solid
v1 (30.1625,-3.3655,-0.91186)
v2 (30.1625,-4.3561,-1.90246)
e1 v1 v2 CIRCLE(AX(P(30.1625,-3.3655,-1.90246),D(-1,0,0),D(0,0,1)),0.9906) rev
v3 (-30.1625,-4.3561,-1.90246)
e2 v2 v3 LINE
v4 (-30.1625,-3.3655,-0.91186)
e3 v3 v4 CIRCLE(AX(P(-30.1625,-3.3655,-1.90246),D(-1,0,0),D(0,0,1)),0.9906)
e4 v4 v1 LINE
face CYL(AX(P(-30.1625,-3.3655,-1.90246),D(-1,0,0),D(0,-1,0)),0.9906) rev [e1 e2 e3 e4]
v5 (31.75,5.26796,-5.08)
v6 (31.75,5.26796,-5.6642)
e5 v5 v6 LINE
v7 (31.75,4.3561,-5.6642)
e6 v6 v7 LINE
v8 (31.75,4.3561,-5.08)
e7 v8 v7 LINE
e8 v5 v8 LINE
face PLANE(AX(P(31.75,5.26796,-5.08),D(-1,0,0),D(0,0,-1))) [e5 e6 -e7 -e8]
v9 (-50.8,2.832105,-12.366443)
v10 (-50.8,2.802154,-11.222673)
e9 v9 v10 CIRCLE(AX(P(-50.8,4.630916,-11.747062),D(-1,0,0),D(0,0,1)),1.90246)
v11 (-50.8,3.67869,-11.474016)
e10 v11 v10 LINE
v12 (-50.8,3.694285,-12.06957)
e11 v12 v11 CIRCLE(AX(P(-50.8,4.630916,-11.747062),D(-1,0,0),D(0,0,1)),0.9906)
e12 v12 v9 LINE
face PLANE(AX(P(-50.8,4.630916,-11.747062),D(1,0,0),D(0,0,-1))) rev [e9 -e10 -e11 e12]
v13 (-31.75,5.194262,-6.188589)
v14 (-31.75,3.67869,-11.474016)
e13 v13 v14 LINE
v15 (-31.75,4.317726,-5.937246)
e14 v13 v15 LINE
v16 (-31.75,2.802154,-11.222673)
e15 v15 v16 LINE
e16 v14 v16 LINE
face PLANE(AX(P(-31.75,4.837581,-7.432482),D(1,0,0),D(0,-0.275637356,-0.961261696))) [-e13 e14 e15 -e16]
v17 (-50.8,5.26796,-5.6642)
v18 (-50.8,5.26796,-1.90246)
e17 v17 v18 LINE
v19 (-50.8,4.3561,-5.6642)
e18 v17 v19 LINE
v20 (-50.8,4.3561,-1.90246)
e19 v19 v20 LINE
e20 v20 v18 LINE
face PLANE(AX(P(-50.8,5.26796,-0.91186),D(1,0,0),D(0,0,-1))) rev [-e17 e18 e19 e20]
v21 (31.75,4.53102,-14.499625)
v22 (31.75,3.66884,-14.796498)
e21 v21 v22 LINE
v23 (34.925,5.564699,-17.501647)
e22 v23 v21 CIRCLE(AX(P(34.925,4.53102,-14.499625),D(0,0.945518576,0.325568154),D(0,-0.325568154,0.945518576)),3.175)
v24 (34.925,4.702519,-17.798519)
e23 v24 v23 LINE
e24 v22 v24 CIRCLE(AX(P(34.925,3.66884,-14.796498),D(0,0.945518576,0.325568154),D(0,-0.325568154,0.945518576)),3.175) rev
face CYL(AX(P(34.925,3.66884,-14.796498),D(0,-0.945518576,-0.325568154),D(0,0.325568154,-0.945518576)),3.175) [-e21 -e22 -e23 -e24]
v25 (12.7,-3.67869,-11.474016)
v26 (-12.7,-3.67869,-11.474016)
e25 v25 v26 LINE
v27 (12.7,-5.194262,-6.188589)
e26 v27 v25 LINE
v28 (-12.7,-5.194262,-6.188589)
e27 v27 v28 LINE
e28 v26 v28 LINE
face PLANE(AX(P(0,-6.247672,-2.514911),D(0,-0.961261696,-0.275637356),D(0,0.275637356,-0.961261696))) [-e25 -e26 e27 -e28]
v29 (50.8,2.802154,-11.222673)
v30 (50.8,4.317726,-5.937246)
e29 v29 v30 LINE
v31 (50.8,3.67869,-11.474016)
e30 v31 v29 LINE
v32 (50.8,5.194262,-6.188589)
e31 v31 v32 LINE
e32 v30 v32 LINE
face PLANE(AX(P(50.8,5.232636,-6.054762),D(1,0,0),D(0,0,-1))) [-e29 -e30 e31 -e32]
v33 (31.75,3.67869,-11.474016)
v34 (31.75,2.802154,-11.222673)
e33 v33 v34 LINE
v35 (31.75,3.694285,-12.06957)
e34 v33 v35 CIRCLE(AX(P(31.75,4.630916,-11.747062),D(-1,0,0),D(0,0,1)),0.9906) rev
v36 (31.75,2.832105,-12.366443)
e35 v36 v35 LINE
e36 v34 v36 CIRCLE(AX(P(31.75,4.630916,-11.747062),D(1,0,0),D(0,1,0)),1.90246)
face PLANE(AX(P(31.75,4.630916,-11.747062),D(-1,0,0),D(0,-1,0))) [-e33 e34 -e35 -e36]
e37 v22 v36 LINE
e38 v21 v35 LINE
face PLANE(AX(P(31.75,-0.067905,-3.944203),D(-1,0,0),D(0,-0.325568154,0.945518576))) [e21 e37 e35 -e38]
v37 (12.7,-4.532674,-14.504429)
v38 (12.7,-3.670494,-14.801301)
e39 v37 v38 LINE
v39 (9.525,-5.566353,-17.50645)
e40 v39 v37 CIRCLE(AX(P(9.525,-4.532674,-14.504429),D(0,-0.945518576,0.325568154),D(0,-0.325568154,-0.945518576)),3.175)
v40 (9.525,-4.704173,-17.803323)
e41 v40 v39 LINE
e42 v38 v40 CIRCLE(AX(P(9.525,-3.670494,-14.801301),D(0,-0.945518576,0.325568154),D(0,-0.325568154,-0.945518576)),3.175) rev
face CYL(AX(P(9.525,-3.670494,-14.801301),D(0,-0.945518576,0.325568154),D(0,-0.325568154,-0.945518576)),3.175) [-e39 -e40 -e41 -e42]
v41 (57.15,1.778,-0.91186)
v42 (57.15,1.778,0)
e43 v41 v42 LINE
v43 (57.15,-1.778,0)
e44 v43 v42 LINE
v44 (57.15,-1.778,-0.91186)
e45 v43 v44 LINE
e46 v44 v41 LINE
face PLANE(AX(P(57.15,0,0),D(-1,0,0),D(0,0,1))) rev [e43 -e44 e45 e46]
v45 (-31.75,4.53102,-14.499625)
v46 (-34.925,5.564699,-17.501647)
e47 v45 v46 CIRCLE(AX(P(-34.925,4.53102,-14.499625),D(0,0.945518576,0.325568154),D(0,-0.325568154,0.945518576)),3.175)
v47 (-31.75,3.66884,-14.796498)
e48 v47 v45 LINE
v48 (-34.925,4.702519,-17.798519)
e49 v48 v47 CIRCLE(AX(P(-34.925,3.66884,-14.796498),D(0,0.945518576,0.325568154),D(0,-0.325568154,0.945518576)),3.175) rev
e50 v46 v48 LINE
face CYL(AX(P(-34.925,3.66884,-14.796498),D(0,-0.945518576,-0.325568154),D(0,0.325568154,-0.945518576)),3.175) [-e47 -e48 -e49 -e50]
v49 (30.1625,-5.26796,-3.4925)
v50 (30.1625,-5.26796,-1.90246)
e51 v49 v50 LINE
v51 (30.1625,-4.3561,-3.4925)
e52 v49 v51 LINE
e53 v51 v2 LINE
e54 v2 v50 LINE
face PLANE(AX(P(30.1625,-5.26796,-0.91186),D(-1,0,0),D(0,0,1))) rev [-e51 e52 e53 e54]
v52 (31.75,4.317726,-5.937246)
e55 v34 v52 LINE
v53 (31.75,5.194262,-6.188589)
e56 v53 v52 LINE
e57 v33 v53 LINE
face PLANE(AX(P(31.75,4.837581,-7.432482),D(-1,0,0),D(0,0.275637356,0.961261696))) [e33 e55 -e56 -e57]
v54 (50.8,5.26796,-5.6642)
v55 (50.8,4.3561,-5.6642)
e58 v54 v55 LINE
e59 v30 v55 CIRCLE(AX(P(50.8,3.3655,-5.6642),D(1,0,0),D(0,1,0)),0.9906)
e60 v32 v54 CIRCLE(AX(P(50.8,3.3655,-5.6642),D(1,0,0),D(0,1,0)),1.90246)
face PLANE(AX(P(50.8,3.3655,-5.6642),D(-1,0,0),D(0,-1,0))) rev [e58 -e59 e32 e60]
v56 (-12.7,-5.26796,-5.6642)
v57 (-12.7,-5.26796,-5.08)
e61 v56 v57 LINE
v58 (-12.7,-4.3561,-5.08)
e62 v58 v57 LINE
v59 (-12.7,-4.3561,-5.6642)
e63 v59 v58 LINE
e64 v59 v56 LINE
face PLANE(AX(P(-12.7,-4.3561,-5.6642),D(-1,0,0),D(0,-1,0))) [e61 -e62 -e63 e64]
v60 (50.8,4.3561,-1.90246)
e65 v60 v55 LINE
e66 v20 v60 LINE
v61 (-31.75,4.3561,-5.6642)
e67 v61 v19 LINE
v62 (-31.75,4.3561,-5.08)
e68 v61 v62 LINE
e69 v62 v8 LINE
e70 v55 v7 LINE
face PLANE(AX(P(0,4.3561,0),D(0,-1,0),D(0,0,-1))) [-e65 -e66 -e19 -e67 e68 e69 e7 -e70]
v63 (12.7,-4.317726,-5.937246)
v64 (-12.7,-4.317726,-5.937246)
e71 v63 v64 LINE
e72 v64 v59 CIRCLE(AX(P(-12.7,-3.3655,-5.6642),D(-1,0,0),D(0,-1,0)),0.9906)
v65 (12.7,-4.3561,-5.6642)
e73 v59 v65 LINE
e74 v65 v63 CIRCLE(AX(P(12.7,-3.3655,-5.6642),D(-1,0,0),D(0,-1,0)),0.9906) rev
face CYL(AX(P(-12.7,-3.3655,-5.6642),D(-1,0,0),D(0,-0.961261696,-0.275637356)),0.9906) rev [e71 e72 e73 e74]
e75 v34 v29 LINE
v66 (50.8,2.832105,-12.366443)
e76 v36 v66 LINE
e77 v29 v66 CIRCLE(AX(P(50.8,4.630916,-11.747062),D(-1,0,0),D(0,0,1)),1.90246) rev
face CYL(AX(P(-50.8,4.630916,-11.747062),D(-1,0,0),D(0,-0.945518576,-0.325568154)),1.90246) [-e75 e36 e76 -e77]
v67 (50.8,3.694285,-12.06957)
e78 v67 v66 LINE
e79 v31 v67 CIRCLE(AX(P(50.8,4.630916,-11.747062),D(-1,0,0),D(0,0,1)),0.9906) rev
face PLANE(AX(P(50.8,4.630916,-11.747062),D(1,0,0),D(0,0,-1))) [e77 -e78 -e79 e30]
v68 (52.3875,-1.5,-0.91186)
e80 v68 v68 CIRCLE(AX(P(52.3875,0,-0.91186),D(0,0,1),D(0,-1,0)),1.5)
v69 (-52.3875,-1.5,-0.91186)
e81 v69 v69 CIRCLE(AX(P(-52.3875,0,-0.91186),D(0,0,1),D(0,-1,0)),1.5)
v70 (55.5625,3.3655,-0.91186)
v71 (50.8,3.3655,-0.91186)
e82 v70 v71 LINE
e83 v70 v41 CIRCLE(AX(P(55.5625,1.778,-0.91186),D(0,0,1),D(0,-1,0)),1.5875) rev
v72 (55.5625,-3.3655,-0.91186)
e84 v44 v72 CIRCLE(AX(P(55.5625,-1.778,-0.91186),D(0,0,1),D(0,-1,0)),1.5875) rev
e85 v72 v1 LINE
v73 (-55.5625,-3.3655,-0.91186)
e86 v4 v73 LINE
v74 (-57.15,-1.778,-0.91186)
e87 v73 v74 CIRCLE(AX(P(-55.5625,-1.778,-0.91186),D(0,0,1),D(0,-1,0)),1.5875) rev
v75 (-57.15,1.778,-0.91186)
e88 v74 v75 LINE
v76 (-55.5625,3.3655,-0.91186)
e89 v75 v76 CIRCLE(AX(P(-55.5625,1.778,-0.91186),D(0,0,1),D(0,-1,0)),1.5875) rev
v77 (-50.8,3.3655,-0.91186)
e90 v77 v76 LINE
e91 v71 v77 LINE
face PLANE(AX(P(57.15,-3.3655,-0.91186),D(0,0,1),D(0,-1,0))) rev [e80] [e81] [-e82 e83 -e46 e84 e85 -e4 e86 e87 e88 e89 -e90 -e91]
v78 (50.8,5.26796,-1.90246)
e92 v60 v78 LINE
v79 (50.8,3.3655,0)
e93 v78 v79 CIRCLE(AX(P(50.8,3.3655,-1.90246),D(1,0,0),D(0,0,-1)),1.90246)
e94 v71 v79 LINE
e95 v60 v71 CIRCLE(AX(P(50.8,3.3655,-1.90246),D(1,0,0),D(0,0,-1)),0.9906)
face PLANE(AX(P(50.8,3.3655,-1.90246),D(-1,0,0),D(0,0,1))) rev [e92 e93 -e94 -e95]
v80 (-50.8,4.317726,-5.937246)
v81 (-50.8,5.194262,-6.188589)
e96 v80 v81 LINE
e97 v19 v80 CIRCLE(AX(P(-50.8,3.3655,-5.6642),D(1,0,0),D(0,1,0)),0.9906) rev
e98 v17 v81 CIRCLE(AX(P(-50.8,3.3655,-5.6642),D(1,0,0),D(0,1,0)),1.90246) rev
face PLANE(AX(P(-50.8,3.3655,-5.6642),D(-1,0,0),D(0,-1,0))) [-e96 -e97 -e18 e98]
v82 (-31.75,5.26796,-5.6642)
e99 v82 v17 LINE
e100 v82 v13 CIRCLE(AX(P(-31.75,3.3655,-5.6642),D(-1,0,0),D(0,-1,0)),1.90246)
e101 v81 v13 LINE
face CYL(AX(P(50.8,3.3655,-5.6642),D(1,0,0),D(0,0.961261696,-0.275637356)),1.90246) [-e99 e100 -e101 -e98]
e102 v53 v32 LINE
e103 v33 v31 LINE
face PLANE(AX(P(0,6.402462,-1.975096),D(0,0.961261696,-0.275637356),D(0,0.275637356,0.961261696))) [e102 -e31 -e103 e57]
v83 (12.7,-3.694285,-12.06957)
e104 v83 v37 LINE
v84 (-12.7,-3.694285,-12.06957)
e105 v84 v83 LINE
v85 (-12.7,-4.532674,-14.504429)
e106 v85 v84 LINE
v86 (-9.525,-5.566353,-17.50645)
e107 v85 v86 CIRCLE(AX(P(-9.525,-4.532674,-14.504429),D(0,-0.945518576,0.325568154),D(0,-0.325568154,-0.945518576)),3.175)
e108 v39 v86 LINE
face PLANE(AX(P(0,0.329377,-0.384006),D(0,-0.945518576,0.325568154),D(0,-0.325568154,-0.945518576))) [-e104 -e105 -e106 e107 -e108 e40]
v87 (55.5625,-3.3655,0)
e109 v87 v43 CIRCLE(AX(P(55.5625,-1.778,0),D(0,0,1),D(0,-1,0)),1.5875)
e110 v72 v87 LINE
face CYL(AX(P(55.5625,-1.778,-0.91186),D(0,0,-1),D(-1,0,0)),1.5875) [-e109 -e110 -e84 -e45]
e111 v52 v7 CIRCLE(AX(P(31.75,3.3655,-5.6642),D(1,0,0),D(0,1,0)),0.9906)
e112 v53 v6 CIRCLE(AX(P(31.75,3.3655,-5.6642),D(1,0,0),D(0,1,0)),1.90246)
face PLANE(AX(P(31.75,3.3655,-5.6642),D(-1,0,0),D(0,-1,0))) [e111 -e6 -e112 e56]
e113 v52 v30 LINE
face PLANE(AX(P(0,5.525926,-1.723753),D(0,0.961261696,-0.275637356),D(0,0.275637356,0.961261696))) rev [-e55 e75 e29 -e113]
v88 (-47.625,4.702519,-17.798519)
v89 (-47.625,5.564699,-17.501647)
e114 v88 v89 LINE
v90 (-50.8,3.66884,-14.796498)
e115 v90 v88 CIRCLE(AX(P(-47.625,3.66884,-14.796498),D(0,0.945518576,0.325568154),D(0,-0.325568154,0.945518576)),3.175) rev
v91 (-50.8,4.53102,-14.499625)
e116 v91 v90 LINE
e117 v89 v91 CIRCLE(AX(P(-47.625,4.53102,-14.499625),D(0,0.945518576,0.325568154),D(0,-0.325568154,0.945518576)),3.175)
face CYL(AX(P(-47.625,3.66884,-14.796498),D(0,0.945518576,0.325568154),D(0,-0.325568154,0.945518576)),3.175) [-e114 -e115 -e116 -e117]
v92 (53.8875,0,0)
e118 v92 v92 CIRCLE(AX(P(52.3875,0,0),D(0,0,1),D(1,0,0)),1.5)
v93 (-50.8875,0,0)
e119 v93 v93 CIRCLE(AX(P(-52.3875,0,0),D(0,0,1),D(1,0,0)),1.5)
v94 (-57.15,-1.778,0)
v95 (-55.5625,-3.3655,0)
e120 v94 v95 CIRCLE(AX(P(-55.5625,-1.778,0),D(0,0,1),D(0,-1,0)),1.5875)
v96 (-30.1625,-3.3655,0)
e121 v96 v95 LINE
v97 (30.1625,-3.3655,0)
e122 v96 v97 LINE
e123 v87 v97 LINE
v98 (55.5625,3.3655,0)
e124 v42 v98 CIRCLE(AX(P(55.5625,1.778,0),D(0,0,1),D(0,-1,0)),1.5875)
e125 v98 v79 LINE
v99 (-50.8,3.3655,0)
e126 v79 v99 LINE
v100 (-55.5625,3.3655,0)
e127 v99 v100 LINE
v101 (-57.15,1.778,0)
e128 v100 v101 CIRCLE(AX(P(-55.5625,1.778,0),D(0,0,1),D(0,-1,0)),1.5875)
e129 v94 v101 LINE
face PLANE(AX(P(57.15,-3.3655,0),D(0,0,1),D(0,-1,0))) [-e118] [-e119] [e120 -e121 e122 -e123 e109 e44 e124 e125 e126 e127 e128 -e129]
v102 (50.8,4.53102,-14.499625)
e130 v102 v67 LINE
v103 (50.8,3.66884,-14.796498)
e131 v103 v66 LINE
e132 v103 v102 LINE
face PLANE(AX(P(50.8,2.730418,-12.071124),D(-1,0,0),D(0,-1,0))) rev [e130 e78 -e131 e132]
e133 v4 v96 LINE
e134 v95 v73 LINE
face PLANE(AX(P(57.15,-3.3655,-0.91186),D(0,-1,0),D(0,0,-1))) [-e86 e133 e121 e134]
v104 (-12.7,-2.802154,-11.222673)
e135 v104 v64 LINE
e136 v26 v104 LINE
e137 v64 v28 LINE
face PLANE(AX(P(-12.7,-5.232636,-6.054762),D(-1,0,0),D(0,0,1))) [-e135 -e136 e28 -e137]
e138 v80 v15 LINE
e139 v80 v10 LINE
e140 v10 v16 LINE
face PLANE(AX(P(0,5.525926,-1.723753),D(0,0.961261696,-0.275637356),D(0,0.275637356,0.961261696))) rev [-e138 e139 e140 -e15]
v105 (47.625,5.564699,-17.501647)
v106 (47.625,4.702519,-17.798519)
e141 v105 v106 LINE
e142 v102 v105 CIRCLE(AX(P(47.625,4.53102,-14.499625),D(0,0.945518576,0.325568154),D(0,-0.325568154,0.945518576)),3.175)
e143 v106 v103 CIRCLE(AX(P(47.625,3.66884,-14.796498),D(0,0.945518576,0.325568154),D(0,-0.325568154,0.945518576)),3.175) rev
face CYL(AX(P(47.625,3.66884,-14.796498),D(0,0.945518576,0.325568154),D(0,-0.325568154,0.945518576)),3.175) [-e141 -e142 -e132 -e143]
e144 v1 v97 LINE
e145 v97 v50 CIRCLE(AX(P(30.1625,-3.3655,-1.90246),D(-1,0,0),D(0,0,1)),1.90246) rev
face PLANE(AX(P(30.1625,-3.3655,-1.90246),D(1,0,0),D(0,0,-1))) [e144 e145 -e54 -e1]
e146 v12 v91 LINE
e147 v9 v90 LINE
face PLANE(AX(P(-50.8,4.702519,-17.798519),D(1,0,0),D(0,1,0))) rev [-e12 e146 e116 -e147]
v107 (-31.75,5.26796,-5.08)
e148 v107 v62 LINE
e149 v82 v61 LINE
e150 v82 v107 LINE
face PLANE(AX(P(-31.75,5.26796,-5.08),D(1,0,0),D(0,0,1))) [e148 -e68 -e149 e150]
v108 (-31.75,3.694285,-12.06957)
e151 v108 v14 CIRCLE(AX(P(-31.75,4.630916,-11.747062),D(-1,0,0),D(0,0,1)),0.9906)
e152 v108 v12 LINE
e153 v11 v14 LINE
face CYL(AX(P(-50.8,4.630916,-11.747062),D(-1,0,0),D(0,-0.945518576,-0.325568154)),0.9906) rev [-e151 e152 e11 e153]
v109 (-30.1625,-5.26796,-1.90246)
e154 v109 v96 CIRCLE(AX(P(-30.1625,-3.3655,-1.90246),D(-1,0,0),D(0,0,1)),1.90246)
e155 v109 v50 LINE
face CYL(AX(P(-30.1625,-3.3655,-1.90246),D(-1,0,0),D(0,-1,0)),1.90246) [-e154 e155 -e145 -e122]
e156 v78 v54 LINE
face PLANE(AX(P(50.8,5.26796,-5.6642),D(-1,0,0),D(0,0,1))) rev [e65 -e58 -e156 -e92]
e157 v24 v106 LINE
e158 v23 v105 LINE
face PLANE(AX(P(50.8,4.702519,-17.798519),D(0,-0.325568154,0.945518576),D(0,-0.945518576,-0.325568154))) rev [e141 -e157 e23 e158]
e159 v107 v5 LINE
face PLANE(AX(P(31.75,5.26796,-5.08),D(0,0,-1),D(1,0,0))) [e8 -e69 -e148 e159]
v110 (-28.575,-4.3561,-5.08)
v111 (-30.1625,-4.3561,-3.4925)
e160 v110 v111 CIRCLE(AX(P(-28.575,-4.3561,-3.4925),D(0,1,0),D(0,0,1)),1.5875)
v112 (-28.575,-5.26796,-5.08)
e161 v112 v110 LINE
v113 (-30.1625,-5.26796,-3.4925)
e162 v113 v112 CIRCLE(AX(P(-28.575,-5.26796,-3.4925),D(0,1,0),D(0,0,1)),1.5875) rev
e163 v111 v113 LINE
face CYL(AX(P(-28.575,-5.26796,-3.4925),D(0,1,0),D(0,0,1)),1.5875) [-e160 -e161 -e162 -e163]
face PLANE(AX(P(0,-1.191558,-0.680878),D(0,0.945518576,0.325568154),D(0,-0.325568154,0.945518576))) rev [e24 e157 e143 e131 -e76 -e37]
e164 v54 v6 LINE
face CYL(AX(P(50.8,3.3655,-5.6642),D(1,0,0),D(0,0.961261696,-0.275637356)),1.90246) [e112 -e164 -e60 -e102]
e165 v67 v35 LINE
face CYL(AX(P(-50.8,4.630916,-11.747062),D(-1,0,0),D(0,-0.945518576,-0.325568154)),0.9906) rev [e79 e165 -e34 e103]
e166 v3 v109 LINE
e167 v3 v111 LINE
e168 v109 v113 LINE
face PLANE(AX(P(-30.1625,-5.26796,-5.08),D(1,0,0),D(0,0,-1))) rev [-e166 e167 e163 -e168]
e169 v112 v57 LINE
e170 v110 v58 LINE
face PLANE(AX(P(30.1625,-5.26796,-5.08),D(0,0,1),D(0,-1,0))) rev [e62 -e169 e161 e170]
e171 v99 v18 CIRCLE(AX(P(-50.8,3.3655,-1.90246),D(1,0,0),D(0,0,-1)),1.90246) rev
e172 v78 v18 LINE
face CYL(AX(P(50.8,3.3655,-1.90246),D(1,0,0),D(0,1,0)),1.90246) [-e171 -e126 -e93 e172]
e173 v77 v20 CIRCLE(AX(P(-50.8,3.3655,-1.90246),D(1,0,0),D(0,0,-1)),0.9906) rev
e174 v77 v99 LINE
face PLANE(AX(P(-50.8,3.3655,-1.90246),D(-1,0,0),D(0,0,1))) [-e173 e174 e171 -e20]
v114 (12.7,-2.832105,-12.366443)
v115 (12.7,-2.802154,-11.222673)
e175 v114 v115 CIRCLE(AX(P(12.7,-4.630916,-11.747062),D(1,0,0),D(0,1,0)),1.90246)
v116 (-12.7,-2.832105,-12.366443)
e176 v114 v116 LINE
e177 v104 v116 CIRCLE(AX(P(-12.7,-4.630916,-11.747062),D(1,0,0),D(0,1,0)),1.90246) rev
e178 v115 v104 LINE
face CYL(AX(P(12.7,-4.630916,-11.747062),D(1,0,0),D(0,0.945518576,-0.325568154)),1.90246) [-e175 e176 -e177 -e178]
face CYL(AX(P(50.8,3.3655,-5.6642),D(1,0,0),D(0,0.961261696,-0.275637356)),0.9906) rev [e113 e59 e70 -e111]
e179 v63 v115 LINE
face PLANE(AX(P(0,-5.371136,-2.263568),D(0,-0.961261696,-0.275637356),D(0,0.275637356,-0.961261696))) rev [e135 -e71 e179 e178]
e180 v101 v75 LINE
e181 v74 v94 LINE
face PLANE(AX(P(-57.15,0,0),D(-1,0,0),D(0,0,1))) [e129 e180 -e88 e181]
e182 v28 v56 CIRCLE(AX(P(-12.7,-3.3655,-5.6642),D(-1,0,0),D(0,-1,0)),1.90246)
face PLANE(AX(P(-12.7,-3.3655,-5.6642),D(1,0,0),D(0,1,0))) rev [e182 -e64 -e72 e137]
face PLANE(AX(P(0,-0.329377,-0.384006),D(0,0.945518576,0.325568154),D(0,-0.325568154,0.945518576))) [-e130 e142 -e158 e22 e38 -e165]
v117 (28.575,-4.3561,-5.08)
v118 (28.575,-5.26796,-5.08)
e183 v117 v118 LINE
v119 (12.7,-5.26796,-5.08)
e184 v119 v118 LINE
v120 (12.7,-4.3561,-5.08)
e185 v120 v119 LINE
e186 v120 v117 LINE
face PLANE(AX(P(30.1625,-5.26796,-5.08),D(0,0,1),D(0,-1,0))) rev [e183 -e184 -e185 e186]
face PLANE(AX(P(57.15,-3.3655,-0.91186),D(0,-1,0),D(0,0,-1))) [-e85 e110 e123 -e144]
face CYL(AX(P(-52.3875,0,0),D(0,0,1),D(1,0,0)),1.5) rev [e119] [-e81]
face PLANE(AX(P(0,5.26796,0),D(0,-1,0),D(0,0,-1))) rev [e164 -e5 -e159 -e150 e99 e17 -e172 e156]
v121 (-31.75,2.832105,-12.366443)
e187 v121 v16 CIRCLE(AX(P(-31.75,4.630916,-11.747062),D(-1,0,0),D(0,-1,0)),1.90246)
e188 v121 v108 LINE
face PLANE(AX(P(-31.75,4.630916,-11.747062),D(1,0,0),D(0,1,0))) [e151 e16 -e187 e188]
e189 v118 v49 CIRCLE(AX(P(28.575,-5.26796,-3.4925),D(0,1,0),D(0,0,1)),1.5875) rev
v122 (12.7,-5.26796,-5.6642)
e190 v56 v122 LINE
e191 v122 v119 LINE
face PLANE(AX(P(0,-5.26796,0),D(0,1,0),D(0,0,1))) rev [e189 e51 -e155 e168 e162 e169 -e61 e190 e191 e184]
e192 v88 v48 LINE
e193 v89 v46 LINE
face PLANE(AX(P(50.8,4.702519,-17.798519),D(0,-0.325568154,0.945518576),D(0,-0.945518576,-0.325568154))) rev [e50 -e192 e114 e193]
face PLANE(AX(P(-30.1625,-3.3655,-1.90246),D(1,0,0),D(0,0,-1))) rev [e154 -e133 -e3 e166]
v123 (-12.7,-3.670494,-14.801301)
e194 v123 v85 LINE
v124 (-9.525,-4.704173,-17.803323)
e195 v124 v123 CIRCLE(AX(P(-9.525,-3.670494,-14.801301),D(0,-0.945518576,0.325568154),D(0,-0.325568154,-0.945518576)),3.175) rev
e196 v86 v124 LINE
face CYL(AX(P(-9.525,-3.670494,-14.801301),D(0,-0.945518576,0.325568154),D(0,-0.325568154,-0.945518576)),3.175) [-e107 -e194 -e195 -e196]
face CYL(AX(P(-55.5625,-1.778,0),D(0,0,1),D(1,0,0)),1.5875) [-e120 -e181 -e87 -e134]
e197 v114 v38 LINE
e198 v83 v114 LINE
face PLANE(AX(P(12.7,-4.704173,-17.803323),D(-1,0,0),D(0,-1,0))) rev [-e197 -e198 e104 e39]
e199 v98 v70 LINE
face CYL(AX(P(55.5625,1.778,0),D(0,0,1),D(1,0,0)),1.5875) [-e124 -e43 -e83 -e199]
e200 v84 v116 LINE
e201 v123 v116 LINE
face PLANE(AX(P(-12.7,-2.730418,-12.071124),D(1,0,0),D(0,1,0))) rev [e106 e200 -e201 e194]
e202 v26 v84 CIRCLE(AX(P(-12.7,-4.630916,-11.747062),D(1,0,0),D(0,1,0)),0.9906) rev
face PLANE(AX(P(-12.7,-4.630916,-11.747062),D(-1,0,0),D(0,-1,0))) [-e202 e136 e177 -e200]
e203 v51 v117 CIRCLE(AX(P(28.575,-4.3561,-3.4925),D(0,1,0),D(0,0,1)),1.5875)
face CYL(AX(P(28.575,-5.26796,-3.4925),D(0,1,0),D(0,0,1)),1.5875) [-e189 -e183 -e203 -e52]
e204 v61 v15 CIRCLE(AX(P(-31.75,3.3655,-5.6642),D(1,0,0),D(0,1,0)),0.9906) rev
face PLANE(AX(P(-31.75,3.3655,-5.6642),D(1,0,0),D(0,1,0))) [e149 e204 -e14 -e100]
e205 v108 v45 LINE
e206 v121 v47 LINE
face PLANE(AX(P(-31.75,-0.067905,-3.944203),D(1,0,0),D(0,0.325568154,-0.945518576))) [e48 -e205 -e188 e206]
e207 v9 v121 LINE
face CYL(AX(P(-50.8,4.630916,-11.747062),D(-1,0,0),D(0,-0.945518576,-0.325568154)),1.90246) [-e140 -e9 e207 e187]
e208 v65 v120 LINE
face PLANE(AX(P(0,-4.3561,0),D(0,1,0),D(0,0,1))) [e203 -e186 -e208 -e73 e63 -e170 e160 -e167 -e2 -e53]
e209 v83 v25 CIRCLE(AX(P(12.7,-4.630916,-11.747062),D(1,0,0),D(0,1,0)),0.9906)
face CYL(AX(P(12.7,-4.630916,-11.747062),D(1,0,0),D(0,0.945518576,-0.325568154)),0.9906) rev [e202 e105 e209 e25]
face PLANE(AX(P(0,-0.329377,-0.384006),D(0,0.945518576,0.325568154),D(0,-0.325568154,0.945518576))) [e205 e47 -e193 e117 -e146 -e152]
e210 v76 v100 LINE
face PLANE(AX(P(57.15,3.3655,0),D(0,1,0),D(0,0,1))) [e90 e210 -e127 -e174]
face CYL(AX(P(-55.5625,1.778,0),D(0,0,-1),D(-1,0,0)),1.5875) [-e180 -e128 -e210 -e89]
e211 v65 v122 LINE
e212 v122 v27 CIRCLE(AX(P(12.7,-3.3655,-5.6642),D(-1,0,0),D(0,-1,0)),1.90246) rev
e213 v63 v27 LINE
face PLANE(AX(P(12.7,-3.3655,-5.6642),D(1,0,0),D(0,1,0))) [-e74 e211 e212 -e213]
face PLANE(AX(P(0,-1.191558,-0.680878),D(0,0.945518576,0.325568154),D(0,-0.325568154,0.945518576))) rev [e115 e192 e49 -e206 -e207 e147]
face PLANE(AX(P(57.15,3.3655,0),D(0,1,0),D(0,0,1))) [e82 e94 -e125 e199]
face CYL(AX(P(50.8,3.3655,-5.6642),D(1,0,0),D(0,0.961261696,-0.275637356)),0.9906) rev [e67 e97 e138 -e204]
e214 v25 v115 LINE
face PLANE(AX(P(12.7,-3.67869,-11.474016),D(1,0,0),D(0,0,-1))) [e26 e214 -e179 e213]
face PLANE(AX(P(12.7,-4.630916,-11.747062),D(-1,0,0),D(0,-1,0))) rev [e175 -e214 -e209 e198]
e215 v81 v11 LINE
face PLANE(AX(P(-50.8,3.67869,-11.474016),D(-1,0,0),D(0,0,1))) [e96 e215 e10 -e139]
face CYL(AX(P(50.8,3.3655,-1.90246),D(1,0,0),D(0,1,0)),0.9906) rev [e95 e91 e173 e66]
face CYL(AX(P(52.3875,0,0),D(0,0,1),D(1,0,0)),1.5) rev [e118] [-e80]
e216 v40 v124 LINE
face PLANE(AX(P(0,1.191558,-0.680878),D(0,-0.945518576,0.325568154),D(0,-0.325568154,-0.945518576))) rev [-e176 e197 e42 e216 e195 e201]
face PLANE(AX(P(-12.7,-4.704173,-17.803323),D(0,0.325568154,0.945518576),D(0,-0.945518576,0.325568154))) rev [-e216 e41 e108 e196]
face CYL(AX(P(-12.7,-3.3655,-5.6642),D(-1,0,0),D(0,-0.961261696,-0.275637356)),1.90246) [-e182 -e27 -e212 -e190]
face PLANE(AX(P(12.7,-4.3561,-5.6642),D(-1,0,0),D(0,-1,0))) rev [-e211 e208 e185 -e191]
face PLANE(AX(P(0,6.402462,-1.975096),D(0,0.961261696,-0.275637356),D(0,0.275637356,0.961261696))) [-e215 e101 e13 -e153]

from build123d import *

# Parameters (mm, degrees)
SKETCH1_W                                 = 0.91186
SKETCH1_H                                 = 6.731
BASE_FLANGE1_DEPTH                        = 57.15
EDGE_FLANGE1_DEPTH                        = 101.6
EDGE_FLANGE2_DEPTH                        = 101.6
EDGE_FLANGE3_DEPTH                        = 101.6
CUT_EXTRUDE1_START                        = -2.539504
SKETCH21_W                                = 63.5
SKETCH21_H                                = 12.718519465
CUT_EXTRUDE1_DEPTH                        = 2.836243
EDGE_FLANGE4_DEPTH                        = 60.325
EDGE_FLANGE5_DEPTH                        = 25.4
EDGE_FLANGE6_DEPTH                        = 25.4
BREAK_CORNER3_START                       = 0.436452344
BREAK_CORNER3_DEPTH                       = 0.91186
BREAK_CORNER3_START_2                     = -1.348312344
BREAK_CORNER3_2_DEPTH                     = 0.91186
BREAK_CORNER4_START                       = -5.26796
BREAK_CORNER4_DEPTH                       = 0.91186
BREAK_CORNER4_START_2                     = -0.91186
BREAK_CORNER4_2_DEPTH                     = 0.91186
HOLE_FOR_M3_FLUSH_HEAD_STUDS_FH_FHS_FHA_D = 3


# Read off the part's stored shape, not the designer's step: Break-Corner3, Break-Corner4
# Sheet-metal steps are written as plain solids
with BuildPart() as part:
    # Sketch1 → Base-Flange1 (new, symmetric)
    with BuildSketch(Plane(origin=(0, 0, 0), x_dir=(0, 0, -1), z_dir=(1, 0, 0))):
        with Locations((0.45593, 0)):
            Rectangle(SKETCH1_W, SKETCH1_H)
    extrude(amount=BASE_FLANGE1_DEPTH, both=True)

    # Edge-Flange1 section (across the edge) → Edge-Flange1 (add)
    with BuildSketch(Plane(origin=(-50.8, 4.3561, -0.91186), x_dir=(0, -1, 0), z_dir=(1, 0, 0))):
        with BuildLine():
            Line((-0.91186, 0.9906), (-0.91186, 4.75234))
            Line((-0.91186, 4.75234), (0, 4.75234))
            Line((0, 4.75234), (0, 0.9906))
            ThreePointArc((0, 0.9906), (0.290140023, 0.290140023), (0.9906, 0))
            Line((0.9906, 0), (0.9906, -0.91186))
            ThreePointArc((0.9906, -0.91186), (-0.354642367, -0.354642367), (-0.91186, 0.9906))
        make_face()
    extrude(amount=EDGE_FLANGE1_DEPTH)

    # Edge-Flange2 section (across the edge) → Edge-Flange2 (add)
    with BuildSketch(Plane(origin=(-50.8, 4.3561, -5.803419751), x_dir=(0, -0.9612616959383217, 0.27563735581698934), z_dir=(1, 0, 0))):
        with BuildLine():
            Line((-0.91186, 0.139219751), (-0.91186, 5.637646434))
            Line((-0.91186, 5.637646434), (0, 5.637646434))
            Line((0, 5.637646434), (0, 0.139219751))
            ThreePointArc((0, 0.139219751), (0.009640451, 0.001354877), (0.038374164, -0.133826614))
            Line((0.038374164, -0.133826614), (-0.838161926, -0.385169293))
            ThreePointArc((-0.838161926, -0.385169293), (-0.89334539, -0.125551507), (-0.91186, 0.139219751))
        make_face()
    extrude(amount=EDGE_FLANGE2_DEPTH)

    # Edge-Flange3 section (across the edge) → Edge-Flange3 (add)
    with BuildSketch(Plane(origin=(50.8, 3.592598946, -11.774251656), x_dir=(0, 0.9455185755993153, 0.32556815445716125), z_dir=(-1, 0, 0))):
        with BuildLine():
            Line((-0.91186, 0.31233498), (-0.91186, 6.057411646))
            Line((-0.91186, 6.057411646), (0, 6.057411646))
            Line((0, 6.057411646), (0, 0.31233498))
            ThreePointArc((0, 0.31233498), (0.045847989, 0.014455815), (0.179147985, -0.255849838))
            Line((0.179147985, -0.255849838), (-0.567803998, -0.778871247))
            ThreePointArc((-0.567803998, -0.778871247), (-0.82380835, -0.259745775), (-0.91186, 0.31233498))
        make_face()
    extrude(amount=EDGE_FLANGE3_DEPTH)

    # Sketch21 → Cut-Extrude1 (cut)
    with BuildSketch(Plane(origin=(0, 5.26796, 0), x_dir=(1, 0, 0), z_dir=(0, 1, 0)).offset(CUT_EXTRUDE1_START)):
        with Locations((0, 11.439259733)):
            Rectangle(SKETCH21_W, SKETCH21_H)
    extrude(amount=CUT_EXTRUDE1_DEPTH, mode=Mode.SUBTRACT)

    # Edge-Flange4 section (across the edge) → Edge-Flange4 (add)
    with BuildSketch(Plane(origin=(30.1625, -4.3561, -0.91186), x_dir=(0, 1, 0), z_dir=(-1, 0, 0))):
        with BuildLine():
            Line((-0.91186, 0.9906), (-0.91186, 4.16814))
            Line((-0.91186, 4.16814), (0, 4.16814))
            Line((0, 4.16814), (0, 0.9906))
            ThreePointArc((0, 0.9906), (0.290140023, 0.290140023), (0.9906, 0))
            Line((0.9906, 0), (0.9906, -0.91186))
            ThreePointArc((0.9906, -0.91186), (-0.354642367, -0.354642367), (-0.91186, 0.9906))
        make_face()
    extrude(amount=EDGE_FLANGE4_DEPTH)

    # Edge-Flange5 section (across the edge) → Edge-Flange5 (add)
    with BuildSketch(Plane(origin=(12.7, -4.3561, -5.803419751), x_dir=(0, 0.9612616959383217, 0.27563735581698967), z_dir=(-1, 0, 0))):
        with BuildLine():
            Line((-0.91186, 0.139219751), (-0.91186, 5.637646434))
            Line((-0.91186, 5.637646434), (0, 5.637646434))
            Line((0, 5.637646434), (0, 0.139219751))
            ThreePointArc((0, 0.139219751), (0.009640451, 0.001354877), (0.038374164, -0.133826614))
            Line((0.038374164, -0.133826614), (0.199401507, -0.695395697))
            Line((0.199401507, -0.695395697), (-0.677134583, -0.946738376))
            Line((-0.677134583, -0.946738376), (-0.838161926, -0.385169293))
            ThreePointArc((-0.838161926, -0.385169293), (-0.89334539, -0.125551507), (-0.91186, 0.139219751))
        make_face()
    extrude(amount=EDGE_FLANGE5_DEPTH)

    # Edge-Flange6 section (across the edge) → Edge-Flange6 (add)
    with BuildSketch(Plane(origin=(-12.7, -3.592598946, -11.774251656), x_dir=(0, -0.9455185755993154, 0.325568154457161), z_dir=(1, 0, 0))):
        with BuildLine():
            Line((-0.91186, 0.31233498), (-0.91186, 6.062491646))
            Line((-0.91186, 6.062491646), (0, 6.062491646))
            Line((0, 6.062491646), (0, 0.31233498))
            ThreePointArc((0, 0.31233498), (0.045847989, 0.014455815), (0.179147985, -0.255849838))
            Line((0.179147985, -0.255849838), (-0.567803998, -0.778871247))
            ThreePointArc((-0.567803998, -0.778871247), (-0.82380835, -0.259745775), (-0.91186, 0.31233498))
        make_face()
    extrude(amount=EDGE_FLANGE6_DEPTH)

    # Break-Corner3 outline → Break-Corner3 (cut)
    with BuildSketch(Plane(origin=(0, 0, 0), x_dir=(1, 0, 0), z_dir=(0, 0.9455185755993153, -0.3255681544571611)).offset(BREAK_CORNER3_START)):
        with BuildLine():
            Line((12.7, 18.364901109), (9.525, 18.364901109))
            ThreePointArc((9.525, 18.364901109), (11.77006403, 17.434965139), (12.7, 15.189901109))
            Line((12.7, 15.189901109), (12.7, 18.364901109))
        make_face()
        with BuildLine():
            ThreePointArc((-12.7, 15.189901109), (-11.77006403, 17.434965139), (-9.525, 18.364901109))
            Line((-9.525, 18.364901109), (-12.7, 18.364901109))
            Line((-12.7, 18.364901109), (-12.7, 15.189901109))
        make_face()
    extrude(amount=BREAK_CORNER3_DEPTH, mode=Mode.SUBTRACT)

    # Break-Corner3 2 outline → Break-Corner3 2 (cut)
    with BuildSketch(Plane(origin=(0, 0, 0), x_dir=(1, 0, 0), z_dir=(0, 0.9455185755993153, 0.3255681544571611)).offset(BREAK_CORNER3_START_2)):
        with BuildLine():
            ThreePointArc((-50.8, 15.184821109), (-49.87006403, 17.429885139), (-47.625, 18.359821109))
            Line((-47.625, 18.359821109), (-50.8, 18.359821109))
            Line((-50.8, 18.359821109), (-50.8, 15.184821109))
        make_face()
        with BuildLine():
            Line((-31.75, 18.359821109), (-34.925, 18.359821109))
            ThreePointArc((-34.925, 18.359821109), (-32.67993597, 17.429885139), (-31.75, 15.184821109))
            Line((-31.75, 15.184821109), (-31.75, 18.359821109))
        make_face()
        with BuildLine():
            Line((31.75, 18.359821109), (31.75, 15.184821109))
            ThreePointArc((31.75, 15.184821109), (32.67993597, 17.429885139), (34.925, 18.359821109))
            Line((34.925, 18.359821109), (31.75, 18.359821109))
        make_face()
        with BuildLine():
            Line((50.8, 18.359821109), (47.625, 18.359821109))
            ThreePointArc((47.625, 18.359821109), (49.87006403, 17.429885139), (50.8, 15.184821109))
            Line((50.8, 15.184821109), (50.8, 18.359821109))
        make_face()
    extrude(amount=BREAK_CORNER3_2_DEPTH, mode=Mode.SUBTRACT)

    # Break-Corner4 outline → Break-Corner4 (cut)
    with BuildSketch(Plane(origin=(0, 0, 0), x_dir=(1, 0, 0), z_dir=(0, 1, 0)).offset(BREAK_CORNER4_START)):
        with BuildLine():
            ThreePointArc((28.575, 5.08), (29.697532015, 4.615032015), (30.1625, 3.4925))
            Line((30.1625, 3.4925), (30.1625, 5.08))
            Line((30.1625, 5.08), (28.575, 5.08))
        make_face()
        with BuildLine():
            ThreePointArc((-30.1625, 3.4925), (-29.697532015, 4.615032015), (-28.575, 5.08))
            Line((-28.575, 5.08), (-30.1625, 5.08))
            Line((-30.1625, 5.08), (-30.1625, 3.4925))
        make_face()
    extrude(amount=BREAK_CORNER4_DEPTH, mode=Mode.SUBTRACT)

    # Break-Corner4 2 outline → Break-Corner4 2 (cut)
    with BuildSketch(Plane.XY.offset(BREAK_CORNER4_START_2)):
        with BuildLine():
            Line((-57.15, 3.3655), (-57.15, 1.778))
            ThreePointArc((-57.15, 1.778), (-56.685032015, 2.900532015), (-55.5625, 3.3655))
            Line((-55.5625, 3.3655), (-57.15, 3.3655))
        make_face()
        with BuildLine():
            ThreePointArc((-55.5625, -3.3655), (-56.685032015, -2.900532015), (-57.15, -1.778))
            Line((-57.15, -1.778), (-57.15, -3.3655))
            Line((-57.15, -3.3655), (-55.5625, -3.3655))
        make_face()
        with BuildLine():
            Line((57.15, -3.3655), (57.15, -1.778))
            ThreePointArc((57.15, -1.778), (56.685032015, -2.900532015), (55.5625, -3.3655))
            Line((55.5625, -3.3655), (57.15, -3.3655))
        make_face()
        with BuildLine():
            ThreePointArc((55.5625, 3.3655), (56.685032015, 2.900532015), (57.15, 1.778))
            Line((57.15, 1.778), (57.15, 3.3655))
            Line((57.15, 3.3655), (55.5625, 3.3655))
        make_face()
    extrude(amount=BREAK_CORNER4_2_DEPTH, mode=Mode.SUBTRACT)

    # Hole for M3 Flush head Studs (FH,FHS,FHA,FH4)1 (through all)
    with Locations(Plane.XY):
        with Locations((52.3875, 0), (-52.3875, 0)):
            Hole(HOLE_FOR_M3_FLUSH_HEAD_STUDS_FH_FHS_FHA_D / 2)


solid = part.part
